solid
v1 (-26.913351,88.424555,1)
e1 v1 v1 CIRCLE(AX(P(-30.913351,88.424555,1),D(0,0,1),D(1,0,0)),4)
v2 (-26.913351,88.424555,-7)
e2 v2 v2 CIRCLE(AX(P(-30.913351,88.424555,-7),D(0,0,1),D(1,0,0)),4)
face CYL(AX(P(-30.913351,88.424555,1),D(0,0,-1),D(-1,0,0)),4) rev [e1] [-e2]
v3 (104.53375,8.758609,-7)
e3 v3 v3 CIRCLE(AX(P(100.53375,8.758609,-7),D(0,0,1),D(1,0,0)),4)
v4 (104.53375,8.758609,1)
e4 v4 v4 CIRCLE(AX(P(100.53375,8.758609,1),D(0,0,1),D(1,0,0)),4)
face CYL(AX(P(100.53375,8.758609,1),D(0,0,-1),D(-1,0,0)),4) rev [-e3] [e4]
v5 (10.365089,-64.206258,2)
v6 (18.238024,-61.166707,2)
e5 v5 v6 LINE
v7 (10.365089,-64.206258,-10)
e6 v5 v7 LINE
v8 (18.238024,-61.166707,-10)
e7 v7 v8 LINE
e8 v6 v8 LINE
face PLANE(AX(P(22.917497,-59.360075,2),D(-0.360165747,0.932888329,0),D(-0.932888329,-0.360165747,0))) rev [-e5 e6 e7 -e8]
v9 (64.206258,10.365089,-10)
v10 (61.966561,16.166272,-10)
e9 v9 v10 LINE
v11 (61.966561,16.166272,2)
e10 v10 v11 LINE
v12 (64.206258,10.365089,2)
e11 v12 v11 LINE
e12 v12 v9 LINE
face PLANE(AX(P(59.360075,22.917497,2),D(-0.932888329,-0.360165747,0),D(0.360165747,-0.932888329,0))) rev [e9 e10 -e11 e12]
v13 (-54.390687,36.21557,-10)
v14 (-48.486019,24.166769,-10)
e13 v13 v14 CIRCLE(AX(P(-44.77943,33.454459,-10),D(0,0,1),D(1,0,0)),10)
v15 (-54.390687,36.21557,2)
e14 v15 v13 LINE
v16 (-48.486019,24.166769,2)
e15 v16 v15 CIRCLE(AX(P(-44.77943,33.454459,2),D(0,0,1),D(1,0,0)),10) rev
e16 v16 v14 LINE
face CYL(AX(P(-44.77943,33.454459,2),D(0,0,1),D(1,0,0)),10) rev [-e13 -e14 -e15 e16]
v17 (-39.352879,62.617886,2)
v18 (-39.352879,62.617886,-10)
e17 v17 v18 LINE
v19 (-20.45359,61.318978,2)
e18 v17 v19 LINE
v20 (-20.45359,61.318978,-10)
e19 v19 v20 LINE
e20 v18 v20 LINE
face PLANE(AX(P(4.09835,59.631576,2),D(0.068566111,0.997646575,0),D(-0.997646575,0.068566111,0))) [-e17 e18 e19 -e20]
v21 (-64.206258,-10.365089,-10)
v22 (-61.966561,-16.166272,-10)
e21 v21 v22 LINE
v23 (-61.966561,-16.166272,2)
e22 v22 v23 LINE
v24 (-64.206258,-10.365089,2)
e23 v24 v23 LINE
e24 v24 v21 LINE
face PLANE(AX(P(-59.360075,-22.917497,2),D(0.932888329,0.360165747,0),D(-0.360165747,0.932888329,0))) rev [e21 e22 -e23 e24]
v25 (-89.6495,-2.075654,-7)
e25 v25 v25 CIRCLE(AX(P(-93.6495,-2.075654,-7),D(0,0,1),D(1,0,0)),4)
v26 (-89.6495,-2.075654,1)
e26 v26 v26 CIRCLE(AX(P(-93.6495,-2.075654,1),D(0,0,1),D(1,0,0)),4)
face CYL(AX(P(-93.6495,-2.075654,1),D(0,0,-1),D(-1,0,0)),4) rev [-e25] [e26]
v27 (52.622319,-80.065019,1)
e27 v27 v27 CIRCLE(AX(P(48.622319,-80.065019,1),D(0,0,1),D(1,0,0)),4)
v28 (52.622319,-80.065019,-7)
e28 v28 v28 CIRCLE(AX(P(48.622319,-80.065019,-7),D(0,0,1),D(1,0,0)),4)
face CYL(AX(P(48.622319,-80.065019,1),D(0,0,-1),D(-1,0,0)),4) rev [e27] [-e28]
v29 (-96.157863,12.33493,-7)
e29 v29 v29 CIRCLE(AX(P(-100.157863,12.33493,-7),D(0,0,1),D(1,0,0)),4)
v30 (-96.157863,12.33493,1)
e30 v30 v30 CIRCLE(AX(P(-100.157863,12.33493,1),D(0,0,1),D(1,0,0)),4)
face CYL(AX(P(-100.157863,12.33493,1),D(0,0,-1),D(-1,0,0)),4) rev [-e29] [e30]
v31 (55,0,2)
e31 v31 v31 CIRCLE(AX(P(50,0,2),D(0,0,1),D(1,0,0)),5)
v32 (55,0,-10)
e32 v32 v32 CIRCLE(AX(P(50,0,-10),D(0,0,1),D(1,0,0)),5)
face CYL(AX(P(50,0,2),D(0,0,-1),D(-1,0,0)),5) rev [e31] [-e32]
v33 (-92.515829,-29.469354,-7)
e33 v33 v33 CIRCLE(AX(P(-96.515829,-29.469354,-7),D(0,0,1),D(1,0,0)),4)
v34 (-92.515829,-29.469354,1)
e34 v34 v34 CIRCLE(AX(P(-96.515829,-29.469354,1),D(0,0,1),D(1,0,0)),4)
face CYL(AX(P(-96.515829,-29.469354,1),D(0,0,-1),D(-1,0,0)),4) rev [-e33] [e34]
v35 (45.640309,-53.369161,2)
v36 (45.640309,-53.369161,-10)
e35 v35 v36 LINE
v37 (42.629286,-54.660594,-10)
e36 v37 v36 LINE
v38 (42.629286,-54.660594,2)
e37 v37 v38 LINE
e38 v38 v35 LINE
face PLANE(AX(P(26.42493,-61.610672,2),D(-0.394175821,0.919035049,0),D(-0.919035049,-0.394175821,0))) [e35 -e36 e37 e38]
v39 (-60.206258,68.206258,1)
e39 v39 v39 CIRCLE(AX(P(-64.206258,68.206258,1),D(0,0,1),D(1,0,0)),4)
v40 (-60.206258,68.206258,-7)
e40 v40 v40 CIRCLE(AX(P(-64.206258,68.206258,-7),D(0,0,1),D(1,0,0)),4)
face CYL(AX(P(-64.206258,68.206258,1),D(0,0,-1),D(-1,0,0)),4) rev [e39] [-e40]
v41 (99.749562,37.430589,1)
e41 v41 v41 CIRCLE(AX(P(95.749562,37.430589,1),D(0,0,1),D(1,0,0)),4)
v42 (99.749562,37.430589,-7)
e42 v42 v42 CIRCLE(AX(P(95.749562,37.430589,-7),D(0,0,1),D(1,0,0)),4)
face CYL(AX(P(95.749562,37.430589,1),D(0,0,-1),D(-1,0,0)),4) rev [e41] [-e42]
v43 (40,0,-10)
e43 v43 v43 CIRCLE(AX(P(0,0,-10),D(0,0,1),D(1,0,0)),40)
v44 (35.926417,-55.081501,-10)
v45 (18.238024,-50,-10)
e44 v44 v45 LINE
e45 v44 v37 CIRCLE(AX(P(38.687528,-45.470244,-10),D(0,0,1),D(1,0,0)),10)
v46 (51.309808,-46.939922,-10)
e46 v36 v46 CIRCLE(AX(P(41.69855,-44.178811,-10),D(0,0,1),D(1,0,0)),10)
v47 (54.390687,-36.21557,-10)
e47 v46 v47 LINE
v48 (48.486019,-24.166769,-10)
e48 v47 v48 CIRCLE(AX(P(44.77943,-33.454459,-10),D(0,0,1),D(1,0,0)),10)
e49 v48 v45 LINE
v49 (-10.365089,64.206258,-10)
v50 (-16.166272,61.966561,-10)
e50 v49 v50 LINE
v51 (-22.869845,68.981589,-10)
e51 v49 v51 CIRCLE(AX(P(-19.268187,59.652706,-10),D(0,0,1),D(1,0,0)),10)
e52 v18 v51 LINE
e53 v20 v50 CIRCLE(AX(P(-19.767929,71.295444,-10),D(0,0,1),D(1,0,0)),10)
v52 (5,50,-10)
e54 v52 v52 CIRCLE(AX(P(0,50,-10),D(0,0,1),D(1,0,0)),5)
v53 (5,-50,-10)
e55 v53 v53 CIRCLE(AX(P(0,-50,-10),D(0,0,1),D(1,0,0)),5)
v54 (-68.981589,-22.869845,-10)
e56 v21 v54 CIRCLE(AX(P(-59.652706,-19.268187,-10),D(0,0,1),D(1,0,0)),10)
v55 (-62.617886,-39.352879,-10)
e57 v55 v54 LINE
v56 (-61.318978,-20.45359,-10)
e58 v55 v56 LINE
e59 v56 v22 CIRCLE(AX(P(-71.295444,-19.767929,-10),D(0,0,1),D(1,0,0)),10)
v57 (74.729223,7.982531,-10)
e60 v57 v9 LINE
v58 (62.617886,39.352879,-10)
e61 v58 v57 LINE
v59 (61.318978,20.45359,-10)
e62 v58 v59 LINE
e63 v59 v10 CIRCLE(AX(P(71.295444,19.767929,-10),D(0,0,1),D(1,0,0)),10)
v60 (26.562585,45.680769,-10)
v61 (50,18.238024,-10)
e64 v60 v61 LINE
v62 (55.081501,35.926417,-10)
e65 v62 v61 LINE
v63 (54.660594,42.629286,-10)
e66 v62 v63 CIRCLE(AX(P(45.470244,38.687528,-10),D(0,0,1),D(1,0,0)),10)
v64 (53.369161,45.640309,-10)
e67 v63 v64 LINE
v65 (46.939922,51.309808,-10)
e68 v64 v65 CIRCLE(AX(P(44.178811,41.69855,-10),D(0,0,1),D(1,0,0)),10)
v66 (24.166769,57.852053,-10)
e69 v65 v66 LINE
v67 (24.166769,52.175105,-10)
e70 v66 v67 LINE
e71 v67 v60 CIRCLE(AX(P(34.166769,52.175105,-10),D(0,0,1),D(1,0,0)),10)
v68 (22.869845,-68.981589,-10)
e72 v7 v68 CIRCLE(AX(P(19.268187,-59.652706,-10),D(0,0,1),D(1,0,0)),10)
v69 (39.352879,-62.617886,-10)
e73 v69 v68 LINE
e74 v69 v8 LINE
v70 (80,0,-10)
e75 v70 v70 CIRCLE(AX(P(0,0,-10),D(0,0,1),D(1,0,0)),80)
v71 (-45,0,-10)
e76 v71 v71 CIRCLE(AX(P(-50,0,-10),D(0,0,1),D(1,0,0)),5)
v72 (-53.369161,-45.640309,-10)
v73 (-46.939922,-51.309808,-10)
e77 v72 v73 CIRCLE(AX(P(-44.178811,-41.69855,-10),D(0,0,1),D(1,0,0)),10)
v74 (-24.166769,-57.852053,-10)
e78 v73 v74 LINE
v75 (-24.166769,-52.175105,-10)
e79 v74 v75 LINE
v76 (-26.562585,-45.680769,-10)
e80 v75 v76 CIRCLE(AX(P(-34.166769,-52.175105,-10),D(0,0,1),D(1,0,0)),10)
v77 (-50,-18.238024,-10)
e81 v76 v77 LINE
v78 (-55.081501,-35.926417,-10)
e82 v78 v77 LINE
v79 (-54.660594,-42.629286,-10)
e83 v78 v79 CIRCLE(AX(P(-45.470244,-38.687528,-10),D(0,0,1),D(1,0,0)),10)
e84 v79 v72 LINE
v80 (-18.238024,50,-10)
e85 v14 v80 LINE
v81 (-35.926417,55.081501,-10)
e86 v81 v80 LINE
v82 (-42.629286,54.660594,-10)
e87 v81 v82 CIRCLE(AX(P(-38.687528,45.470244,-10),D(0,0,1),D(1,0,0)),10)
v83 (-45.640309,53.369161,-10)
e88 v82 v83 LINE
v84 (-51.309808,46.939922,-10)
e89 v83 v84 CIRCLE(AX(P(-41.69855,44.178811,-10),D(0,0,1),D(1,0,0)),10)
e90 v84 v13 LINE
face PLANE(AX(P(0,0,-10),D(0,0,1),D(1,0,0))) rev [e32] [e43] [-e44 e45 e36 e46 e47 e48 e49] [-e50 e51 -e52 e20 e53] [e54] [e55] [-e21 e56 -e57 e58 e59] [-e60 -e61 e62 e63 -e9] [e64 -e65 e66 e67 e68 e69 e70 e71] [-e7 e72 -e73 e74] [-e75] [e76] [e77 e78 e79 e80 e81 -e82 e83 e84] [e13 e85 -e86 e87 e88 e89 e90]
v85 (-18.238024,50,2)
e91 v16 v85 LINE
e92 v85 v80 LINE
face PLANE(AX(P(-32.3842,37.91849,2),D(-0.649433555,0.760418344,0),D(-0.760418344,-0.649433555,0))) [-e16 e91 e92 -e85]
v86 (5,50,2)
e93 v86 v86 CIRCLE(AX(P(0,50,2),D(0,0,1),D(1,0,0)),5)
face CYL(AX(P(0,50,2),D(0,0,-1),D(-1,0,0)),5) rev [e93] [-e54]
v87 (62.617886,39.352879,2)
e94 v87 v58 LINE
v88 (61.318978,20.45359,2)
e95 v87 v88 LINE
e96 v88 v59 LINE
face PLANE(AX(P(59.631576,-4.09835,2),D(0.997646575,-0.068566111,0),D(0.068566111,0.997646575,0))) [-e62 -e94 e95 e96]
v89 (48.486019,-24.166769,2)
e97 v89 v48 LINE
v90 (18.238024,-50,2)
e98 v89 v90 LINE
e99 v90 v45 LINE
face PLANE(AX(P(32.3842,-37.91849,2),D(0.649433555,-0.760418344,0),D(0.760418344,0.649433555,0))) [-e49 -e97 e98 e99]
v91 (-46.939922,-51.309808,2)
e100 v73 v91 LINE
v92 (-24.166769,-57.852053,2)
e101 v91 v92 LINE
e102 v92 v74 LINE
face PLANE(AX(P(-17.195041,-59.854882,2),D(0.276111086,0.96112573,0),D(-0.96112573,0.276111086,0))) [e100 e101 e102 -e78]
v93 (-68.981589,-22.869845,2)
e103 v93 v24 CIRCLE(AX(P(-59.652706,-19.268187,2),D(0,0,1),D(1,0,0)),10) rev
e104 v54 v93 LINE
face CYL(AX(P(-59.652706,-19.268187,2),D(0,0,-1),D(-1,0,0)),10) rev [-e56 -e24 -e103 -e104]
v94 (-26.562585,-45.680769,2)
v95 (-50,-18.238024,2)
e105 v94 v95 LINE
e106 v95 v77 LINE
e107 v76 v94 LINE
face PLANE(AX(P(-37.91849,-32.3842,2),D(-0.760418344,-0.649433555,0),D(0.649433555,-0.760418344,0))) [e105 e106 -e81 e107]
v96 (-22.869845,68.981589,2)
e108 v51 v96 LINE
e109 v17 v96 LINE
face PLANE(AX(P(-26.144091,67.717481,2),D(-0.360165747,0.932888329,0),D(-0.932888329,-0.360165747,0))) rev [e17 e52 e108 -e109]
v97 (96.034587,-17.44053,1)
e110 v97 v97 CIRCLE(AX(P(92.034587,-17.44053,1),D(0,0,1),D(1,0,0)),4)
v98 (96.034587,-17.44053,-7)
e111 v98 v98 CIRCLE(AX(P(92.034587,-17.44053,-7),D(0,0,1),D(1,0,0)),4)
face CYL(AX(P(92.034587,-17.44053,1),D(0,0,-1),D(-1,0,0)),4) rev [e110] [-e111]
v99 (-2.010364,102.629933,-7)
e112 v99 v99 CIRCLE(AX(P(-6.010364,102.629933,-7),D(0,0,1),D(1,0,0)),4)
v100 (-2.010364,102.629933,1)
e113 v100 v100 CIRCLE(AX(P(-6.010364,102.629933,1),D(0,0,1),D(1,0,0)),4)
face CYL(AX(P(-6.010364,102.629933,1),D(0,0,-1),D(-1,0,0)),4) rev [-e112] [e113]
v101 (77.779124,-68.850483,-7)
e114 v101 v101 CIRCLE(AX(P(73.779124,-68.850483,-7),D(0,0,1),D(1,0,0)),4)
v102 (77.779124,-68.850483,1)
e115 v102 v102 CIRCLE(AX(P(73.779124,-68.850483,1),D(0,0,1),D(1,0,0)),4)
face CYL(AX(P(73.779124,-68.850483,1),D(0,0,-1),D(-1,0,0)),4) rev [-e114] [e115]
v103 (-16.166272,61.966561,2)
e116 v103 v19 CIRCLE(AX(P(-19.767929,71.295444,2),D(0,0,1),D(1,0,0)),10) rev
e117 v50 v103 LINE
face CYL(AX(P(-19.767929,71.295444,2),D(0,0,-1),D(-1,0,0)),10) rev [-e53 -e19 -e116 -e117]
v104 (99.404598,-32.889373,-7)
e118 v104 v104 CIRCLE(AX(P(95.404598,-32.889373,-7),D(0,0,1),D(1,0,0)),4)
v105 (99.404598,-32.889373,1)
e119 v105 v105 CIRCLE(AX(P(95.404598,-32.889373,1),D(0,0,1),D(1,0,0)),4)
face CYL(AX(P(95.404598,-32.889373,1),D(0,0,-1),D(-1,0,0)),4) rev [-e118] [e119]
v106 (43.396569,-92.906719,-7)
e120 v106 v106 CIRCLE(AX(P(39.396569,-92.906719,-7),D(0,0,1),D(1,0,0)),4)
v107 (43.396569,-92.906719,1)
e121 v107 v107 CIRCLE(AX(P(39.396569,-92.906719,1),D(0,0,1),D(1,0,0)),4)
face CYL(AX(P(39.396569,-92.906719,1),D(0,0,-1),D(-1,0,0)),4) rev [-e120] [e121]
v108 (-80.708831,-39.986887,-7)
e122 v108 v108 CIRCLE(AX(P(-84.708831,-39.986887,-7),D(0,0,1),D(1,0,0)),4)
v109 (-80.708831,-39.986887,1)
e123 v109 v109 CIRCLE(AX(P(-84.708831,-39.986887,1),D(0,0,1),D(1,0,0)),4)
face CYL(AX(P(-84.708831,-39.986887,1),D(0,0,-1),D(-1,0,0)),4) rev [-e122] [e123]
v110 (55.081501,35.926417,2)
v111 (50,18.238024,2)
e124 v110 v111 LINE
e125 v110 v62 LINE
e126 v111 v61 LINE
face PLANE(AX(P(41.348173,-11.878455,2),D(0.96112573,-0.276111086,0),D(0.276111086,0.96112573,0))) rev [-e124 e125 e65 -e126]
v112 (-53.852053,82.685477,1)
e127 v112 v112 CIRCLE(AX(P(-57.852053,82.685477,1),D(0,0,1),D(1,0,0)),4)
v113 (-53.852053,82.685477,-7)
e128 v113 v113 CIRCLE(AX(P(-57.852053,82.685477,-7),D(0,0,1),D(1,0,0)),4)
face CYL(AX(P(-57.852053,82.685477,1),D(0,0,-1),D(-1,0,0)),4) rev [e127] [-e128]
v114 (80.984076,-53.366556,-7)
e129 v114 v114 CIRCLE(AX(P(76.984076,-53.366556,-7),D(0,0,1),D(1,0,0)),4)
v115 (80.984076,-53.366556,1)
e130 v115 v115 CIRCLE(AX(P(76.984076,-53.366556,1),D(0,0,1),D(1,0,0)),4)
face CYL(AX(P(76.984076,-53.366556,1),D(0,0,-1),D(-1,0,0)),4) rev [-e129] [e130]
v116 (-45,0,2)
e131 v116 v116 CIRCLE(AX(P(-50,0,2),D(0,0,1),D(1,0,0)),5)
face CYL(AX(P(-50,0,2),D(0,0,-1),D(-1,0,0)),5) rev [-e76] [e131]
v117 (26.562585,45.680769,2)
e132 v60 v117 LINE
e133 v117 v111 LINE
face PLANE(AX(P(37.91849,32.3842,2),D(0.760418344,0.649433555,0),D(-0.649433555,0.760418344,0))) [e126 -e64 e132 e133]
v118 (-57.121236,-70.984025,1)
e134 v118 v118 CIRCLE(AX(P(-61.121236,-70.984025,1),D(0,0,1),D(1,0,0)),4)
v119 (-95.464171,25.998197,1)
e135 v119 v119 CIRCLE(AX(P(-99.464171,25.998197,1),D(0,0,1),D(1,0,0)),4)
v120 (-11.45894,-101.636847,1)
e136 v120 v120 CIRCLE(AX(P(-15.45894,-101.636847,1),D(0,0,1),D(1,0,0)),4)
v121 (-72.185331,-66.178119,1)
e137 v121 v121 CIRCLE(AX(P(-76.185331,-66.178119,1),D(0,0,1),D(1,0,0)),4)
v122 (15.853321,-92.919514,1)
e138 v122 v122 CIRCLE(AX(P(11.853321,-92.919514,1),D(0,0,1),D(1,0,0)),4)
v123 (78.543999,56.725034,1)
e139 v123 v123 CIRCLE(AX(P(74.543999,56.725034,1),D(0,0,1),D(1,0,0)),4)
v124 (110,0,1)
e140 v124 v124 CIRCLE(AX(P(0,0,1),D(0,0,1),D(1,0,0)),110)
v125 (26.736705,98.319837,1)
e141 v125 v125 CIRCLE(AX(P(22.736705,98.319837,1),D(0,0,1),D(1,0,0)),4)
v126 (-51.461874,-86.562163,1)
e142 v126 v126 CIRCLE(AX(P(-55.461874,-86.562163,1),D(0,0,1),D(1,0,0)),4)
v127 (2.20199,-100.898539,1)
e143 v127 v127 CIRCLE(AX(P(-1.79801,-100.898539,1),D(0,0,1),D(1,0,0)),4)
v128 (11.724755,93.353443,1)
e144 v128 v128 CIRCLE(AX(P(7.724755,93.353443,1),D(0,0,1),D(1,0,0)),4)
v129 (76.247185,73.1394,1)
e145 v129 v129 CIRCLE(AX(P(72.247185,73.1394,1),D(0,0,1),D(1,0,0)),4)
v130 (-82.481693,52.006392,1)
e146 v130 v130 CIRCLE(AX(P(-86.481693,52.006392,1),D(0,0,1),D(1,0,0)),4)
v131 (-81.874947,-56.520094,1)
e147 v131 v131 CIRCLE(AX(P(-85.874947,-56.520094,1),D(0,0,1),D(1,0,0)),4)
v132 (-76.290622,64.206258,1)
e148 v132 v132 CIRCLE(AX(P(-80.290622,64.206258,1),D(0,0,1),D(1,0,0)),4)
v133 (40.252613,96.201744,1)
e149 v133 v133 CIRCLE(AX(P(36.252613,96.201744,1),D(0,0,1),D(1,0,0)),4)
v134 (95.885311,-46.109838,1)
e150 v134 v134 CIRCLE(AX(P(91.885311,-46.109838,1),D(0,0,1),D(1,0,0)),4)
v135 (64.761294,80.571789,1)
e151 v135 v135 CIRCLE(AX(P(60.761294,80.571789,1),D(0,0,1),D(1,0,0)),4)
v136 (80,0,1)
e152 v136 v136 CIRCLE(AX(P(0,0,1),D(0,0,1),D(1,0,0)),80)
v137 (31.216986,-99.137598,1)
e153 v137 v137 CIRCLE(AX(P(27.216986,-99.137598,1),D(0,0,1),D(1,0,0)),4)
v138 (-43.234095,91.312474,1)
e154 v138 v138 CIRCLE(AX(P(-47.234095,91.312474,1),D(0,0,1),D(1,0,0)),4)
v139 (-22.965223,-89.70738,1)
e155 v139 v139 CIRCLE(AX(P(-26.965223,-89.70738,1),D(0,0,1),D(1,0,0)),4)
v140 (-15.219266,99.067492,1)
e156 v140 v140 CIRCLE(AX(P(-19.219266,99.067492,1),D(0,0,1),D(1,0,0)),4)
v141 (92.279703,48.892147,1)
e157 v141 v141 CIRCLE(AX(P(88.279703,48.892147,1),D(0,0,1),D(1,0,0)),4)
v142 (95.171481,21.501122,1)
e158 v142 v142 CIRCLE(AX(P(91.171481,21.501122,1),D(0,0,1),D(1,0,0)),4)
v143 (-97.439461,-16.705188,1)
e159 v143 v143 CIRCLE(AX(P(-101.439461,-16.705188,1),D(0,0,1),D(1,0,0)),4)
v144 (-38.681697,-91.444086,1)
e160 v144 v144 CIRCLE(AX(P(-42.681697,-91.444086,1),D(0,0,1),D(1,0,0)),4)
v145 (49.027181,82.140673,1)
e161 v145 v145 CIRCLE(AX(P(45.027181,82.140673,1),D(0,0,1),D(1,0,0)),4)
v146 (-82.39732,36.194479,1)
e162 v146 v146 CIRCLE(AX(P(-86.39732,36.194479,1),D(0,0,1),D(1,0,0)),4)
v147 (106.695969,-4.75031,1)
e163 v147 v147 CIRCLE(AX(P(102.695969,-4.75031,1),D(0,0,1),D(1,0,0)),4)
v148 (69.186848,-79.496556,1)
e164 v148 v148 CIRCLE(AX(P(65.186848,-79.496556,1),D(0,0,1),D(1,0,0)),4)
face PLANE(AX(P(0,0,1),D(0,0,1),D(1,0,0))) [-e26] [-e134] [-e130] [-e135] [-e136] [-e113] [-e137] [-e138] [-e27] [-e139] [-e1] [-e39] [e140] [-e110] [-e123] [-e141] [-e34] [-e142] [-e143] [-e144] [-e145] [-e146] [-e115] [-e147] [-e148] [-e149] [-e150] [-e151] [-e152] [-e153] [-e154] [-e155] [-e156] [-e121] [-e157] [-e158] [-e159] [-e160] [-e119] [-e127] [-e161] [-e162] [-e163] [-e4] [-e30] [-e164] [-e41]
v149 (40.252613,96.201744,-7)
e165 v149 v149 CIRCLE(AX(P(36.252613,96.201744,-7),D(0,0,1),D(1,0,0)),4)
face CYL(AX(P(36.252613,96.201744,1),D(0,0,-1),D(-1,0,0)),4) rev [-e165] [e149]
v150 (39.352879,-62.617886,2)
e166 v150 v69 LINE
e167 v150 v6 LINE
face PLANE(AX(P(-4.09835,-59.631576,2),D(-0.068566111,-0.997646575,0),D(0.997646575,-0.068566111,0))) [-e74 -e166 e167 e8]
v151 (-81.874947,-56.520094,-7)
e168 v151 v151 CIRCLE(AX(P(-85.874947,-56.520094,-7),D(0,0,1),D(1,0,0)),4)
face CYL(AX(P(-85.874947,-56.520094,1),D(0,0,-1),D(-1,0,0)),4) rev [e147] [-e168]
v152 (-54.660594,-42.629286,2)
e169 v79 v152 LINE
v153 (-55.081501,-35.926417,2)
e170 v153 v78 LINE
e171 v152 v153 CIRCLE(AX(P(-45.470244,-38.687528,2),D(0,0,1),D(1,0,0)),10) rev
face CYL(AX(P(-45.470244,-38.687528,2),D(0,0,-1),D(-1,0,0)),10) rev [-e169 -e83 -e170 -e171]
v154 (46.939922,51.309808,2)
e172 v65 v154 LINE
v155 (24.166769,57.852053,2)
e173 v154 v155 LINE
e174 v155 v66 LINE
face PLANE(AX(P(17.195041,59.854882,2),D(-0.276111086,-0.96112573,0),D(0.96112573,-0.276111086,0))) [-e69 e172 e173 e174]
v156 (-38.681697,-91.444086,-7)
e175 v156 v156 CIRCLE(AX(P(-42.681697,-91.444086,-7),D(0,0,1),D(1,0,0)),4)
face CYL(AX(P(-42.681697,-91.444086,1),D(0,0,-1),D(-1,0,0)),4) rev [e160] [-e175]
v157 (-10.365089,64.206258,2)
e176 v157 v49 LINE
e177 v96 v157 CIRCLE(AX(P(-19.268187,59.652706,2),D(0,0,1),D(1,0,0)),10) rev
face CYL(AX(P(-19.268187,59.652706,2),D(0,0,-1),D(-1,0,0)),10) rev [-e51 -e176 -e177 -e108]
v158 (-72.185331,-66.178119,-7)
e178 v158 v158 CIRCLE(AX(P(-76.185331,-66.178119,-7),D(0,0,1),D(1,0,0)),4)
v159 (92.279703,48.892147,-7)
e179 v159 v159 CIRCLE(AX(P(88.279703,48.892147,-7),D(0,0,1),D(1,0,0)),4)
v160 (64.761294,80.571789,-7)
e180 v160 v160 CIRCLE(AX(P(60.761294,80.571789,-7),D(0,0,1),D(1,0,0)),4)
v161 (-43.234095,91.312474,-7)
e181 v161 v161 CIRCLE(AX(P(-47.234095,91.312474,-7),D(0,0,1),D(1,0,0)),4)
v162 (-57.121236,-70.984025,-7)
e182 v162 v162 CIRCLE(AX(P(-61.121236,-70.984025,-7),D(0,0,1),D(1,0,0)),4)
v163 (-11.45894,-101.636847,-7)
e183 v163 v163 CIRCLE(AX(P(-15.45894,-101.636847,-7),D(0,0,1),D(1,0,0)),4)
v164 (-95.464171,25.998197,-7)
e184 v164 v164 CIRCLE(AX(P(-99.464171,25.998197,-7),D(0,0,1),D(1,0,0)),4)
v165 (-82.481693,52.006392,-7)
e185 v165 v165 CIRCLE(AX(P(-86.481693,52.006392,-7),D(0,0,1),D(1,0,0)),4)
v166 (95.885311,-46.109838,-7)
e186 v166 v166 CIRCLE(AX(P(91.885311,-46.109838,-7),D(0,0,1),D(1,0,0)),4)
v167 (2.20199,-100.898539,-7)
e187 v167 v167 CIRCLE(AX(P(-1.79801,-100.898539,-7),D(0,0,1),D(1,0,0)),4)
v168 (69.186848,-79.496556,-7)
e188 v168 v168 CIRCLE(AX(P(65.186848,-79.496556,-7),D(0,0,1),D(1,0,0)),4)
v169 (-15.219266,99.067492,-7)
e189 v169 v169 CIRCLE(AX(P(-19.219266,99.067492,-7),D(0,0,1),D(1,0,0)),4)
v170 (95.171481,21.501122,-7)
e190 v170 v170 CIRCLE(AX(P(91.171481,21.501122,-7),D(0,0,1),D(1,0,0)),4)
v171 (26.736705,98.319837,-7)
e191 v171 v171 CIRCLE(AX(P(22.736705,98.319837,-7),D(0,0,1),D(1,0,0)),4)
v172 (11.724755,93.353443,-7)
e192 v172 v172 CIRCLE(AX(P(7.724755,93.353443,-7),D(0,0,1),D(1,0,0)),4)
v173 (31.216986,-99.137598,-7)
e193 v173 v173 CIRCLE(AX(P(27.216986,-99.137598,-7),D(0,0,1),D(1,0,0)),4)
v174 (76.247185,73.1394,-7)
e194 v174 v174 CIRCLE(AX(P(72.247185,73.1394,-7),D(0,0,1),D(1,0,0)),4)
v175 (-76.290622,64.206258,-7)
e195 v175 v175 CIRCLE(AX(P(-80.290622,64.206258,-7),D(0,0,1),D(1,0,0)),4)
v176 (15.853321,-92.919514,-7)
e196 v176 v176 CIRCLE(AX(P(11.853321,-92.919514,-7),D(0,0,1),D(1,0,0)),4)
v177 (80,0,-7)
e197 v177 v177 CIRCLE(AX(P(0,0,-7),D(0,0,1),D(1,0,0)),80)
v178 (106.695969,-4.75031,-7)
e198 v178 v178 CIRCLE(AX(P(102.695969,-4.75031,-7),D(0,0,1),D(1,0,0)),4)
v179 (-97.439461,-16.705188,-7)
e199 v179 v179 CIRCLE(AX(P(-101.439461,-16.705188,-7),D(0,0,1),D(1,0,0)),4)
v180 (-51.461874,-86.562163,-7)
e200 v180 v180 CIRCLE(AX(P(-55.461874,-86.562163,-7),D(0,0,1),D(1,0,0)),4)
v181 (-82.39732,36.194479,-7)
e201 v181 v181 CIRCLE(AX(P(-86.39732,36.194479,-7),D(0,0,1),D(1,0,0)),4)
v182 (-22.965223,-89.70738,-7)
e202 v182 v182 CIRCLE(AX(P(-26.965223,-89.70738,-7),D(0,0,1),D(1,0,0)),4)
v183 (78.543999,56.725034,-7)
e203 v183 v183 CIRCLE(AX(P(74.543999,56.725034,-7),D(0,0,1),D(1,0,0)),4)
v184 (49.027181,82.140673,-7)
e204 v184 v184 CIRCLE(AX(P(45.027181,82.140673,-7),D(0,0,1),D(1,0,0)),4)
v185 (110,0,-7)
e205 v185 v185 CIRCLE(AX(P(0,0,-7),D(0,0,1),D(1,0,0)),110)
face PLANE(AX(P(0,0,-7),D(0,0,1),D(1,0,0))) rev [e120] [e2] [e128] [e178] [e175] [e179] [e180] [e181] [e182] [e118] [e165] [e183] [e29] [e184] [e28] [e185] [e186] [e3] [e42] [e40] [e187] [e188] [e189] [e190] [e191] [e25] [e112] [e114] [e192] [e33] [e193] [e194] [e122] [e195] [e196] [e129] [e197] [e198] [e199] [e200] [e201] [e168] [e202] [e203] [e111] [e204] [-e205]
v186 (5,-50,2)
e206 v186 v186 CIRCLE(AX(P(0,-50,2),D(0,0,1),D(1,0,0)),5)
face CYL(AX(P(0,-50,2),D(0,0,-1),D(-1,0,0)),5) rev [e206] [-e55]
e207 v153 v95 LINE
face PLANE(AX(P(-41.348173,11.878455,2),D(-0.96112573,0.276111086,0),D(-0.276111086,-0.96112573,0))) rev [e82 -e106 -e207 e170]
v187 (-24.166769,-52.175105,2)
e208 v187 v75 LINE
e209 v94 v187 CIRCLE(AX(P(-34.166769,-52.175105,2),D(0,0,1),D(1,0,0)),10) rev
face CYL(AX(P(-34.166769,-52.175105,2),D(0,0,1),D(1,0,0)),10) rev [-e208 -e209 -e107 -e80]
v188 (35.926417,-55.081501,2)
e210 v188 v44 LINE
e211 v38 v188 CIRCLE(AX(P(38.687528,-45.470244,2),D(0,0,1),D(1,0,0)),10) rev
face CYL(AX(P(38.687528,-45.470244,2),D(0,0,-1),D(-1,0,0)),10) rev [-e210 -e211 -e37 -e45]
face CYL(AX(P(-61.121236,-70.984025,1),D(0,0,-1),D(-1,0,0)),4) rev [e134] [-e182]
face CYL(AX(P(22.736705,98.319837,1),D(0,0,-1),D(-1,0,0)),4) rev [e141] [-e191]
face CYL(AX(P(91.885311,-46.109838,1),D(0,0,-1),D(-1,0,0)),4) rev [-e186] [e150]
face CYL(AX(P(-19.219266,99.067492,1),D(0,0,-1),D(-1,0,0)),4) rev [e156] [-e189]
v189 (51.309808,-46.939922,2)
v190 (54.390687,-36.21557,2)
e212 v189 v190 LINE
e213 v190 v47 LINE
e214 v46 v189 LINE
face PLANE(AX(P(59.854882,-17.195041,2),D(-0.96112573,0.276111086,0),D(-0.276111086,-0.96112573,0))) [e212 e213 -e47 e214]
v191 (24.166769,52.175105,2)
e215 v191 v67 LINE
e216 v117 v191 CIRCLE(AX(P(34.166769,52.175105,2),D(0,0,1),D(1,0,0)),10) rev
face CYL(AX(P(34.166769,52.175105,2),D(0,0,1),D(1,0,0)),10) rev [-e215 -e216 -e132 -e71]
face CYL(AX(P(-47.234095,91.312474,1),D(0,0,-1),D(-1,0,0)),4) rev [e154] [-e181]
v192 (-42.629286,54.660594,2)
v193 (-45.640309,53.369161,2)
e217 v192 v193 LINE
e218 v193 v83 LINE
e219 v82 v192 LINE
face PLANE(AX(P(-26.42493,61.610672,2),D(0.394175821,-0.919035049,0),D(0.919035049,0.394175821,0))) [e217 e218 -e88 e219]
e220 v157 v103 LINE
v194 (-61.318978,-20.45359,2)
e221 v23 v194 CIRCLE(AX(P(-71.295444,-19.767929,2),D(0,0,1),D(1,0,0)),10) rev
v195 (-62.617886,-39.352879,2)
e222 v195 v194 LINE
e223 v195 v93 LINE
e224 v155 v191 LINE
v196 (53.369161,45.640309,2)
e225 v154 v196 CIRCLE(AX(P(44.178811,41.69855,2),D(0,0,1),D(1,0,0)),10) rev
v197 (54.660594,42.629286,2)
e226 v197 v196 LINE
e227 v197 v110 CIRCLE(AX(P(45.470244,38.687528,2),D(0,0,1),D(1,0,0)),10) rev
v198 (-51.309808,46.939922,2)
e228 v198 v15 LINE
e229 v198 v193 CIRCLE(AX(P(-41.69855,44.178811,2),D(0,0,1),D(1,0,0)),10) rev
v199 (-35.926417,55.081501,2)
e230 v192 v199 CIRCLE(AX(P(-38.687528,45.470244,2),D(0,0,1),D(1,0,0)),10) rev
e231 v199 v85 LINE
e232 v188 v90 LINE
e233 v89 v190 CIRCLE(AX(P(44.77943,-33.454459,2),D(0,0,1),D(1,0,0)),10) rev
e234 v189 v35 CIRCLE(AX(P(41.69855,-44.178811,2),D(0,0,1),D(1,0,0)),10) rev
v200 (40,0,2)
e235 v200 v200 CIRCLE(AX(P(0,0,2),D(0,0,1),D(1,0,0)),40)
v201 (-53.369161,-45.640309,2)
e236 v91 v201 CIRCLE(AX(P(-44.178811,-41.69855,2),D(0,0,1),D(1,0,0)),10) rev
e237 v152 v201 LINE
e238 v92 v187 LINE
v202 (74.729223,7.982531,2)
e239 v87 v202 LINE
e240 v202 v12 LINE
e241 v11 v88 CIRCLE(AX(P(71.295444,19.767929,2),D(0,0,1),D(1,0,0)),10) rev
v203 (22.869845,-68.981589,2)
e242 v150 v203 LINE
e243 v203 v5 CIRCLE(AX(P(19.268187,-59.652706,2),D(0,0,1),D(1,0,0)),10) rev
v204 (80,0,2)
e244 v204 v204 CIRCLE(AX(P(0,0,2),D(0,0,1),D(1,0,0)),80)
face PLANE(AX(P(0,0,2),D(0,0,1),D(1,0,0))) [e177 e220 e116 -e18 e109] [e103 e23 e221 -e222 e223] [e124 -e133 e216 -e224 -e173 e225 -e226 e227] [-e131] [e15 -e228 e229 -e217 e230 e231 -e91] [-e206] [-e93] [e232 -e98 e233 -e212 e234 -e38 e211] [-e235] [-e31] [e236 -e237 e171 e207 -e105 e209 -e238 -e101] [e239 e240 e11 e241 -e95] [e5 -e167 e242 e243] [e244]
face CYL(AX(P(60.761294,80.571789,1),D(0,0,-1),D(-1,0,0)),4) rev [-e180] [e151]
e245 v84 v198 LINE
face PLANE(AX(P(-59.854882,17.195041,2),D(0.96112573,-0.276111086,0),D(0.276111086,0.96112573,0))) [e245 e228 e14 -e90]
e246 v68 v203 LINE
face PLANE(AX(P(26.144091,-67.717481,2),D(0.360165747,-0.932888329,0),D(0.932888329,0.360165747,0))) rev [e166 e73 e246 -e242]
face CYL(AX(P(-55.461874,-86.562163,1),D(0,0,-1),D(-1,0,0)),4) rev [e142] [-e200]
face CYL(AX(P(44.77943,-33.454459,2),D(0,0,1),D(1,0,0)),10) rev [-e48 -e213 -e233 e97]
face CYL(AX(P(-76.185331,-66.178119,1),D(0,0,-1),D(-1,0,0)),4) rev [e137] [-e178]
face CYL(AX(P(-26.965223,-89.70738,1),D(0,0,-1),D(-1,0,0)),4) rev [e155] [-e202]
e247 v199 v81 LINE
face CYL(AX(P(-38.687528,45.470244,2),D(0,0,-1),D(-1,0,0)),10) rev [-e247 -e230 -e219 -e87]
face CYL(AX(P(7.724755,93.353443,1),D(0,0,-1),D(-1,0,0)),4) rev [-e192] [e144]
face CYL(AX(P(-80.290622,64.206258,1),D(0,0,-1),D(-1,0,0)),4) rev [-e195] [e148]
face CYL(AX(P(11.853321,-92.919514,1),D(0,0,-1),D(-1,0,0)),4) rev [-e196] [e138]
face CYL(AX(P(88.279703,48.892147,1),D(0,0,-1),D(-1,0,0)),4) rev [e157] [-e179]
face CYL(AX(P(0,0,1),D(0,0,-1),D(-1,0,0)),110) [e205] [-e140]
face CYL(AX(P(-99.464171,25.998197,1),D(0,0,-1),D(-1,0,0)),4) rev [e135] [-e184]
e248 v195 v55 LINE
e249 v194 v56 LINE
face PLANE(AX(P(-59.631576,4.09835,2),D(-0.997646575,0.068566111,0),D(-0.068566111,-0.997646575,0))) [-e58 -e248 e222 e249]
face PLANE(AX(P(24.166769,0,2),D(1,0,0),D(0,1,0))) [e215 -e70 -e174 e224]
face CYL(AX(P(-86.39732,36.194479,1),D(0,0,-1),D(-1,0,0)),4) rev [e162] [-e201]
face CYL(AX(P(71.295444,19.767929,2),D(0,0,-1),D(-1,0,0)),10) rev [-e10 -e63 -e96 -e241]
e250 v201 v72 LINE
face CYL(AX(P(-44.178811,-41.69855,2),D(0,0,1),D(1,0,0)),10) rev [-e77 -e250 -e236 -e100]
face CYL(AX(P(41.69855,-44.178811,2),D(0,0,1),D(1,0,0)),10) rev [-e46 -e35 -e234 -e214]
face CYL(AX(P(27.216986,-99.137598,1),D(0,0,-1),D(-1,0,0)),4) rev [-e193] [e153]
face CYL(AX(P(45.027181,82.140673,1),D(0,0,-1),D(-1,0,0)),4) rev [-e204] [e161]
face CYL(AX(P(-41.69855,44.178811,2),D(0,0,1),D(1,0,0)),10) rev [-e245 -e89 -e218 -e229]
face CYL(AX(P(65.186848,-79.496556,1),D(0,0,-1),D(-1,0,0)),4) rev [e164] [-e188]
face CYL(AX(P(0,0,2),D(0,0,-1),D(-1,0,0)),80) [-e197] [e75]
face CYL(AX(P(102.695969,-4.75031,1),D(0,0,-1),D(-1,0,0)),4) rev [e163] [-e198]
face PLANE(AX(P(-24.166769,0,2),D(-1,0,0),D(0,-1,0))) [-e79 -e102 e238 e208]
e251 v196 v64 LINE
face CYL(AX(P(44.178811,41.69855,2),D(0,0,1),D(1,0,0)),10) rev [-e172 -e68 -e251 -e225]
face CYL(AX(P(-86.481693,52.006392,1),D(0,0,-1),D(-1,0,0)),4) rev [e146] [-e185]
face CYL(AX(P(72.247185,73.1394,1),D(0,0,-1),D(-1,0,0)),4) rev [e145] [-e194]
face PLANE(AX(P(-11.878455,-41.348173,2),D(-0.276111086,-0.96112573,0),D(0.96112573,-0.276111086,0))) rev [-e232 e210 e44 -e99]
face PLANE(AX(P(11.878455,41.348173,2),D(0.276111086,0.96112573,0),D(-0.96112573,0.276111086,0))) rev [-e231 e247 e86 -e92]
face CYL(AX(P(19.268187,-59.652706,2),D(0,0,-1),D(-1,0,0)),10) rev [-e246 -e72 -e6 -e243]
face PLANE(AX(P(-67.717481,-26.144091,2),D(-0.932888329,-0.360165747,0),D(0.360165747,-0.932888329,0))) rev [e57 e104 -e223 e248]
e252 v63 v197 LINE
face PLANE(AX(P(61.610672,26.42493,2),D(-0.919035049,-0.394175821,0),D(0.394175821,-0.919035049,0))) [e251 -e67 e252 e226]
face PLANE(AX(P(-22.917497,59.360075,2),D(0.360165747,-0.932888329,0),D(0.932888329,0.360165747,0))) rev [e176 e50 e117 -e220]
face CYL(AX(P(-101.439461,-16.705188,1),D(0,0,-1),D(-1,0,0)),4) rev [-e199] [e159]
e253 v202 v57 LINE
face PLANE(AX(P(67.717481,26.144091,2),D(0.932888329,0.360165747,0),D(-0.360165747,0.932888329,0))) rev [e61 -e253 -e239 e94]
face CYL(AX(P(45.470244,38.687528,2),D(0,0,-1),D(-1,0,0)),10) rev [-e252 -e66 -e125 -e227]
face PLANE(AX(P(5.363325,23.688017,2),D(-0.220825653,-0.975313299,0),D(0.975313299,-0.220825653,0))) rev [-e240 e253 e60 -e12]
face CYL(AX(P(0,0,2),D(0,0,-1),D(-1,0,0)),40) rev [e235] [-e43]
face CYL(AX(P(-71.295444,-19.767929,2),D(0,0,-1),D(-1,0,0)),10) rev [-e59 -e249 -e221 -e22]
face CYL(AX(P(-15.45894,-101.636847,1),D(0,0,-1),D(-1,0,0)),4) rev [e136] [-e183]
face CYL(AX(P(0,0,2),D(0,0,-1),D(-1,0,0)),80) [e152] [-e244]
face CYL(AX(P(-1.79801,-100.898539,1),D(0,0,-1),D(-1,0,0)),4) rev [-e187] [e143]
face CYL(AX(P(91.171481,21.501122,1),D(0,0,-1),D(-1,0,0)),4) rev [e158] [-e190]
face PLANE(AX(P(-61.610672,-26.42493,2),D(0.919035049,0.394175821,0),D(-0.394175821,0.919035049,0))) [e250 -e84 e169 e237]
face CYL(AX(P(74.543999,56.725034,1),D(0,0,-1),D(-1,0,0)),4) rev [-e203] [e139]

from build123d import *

# Parameters (mm, degrees)
BOSS_EXTRUDE3_DEPTH      = 2
BOSS_EXTRUDE3_DEPTH_BACK = 10
SKETCH1_R                = 80
SKETCH1_R_2              = 40
SKETCH1_R_3              = 5
BOSS_EXTRUDE4_DEPTH      = 1
BOSS_EXTRUDE4_DEPTH_BACK = 7
SKETCH1_6_R              = 110
SKETCH1_6_R_2            = 4
SKETCH1_6_R_3            = 80
FILLET1_R                = 10


with BuildPart() as part:
    # Sketch1 → Boss-Extrude3 (new, two sides: drawn at the far end of the back side and taken through both)
    with BuildSketch(Plane.XY.offset(-BOSS_EXTRUDE3_DEPTH_BACK)):
        Circle(SKETCH1_R)
        Circle(SKETCH1_R_2, mode=Mode.SUBTRACT)
        with Locations((0, 50)):
            Circle(SKETCH1_R_3, mode=Mode.SUBTRACT)
        with Locations((50, 0)):
            Circle(SKETCH1_R_3, mode=Mode.SUBTRACT)
        with Locations((0, -50)):
            Circle(SKETCH1_R_3, mode=Mode.SUBTRACT)
        with Locations((-50, 0)):
            Circle(SKETCH1_R_3, mode=Mode.SUBTRACT)
        Polygon((-39.35287908, 62.61788604), (-7.982530522, 74.729223141), (-10.365088641, 64.206258119), (-18.238023599, 61.166707281), align=None, mode=Mode.SUBTRACT)
        Polygon((-39.35287908, 56.065851214), (-18.238023599, 50), (-48.486018534, 24.166768812), (-57.852052568, 24.166768812), (-50, 51.499281488), align=None, mode=Mode.SUBTRACT)
        Polygon((62.61788604, 39.35287908), (61.166707281, 18.238023599), (64.206258119, 10.365088641), (74.729223141, 7.982530522), align=None, mode=Mode.SUBTRACT)
        Polygon((24.166768812, 48.486018534), (50, 18.238023599), (56.065851214, 39.35287908), (51.499281488, 50), (24.166768812, 57.852052568), align=None, mode=Mode.SUBTRACT)
        Polygon((39.35287908, -62.61788604), (18.238023599, -61.166707281), (10.365088641, -64.206258119), (7.982530522, -74.729223141), align=None, mode=Mode.SUBTRACT)
        Polygon((48.486018534, -24.166768812), (18.238023599, -50), (39.35287908, -56.065851214), (50, -51.499281488), (57.852052568, -24.166768812), align=None, mode=Mode.SUBTRACT)
        Polygon((-62.61788604, -39.35287908), (-61.166707281, -18.238023599), (-64.206258119, -10.365088641), (-74.729223141, -7.982530522), align=None, mode=Mode.SUBTRACT)
        Polygon((-24.166768812, -48.486018534), (-50, -18.238023599), (-56.065851214, -39.35287908), (-51.499281488, -50), (-24.166768812, -57.852052568), align=None, mode=Mode.SUBTRACT)
    extrude(amount=BOSS_EXTRUDE3_DEPTH + BOSS_EXTRUDE3_DEPTH_BACK)

    # Sketch1<6> → Boss-Extrude4 (add, two sides: drawn at the far end of the back side and taken through both)
    with BuildSketch(Plane.XY.offset(-BOSS_EXTRUDE4_DEPTH_BACK)):
        Circle(SKETCH1_6_R)
        with Locations((-55.461874175, -86.562163177)):
            Circle(SKETCH1_6_R_2, mode=Mode.SUBTRACT)
        with Locations((-85.874946892, -56.520094454)):
            Circle(SKETCH1_6_R_2, mode=Mode.SUBTRACT)
        with Locations((-61.121235607, -70.984024865)):
            Circle(SKETCH1_6_R_2, mode=Mode.SUBTRACT)
        with Locations((-76.185331155, -66.178118816)):
            Circle(SKETCH1_6_R_2, mode=Mode.SUBTRACT)
        with Locations((-42.681697323, -91.444085685)):
            Circle(SKETCH1_6_R_2, mode=Mode.SUBTRACT)
        with Locations((-15.458939556, -101.636847495)):
            Circle(SKETCH1_6_R_2, mode=Mode.SUBTRACT)
        with Locations((-1.798010273, -100.898539396)):
            Circle(SKETCH1_6_R_2, mode=Mode.SUBTRACT)
        with Locations((-26.965223169, -89.707379672)):
            Circle(SKETCH1_6_R_2, mode=Mode.SUBTRACT)
        with Locations((-96.515829108, -29.469353994)):
            Circle(SKETCH1_6_R_2, mode=Mode.SUBTRACT)
        with Locations((-84.70883114, -39.986887289)):
            Circle(SKETCH1_6_R_2, mode=Mode.SUBTRACT)
        with Locations((-101.439461143, -16.70518793)):
            Circle(SKETCH1_6_R_2, mode=Mode.SUBTRACT)
        with Locations((-93.649500213, -2.075653632)):
            Circle(SKETCH1_6_R_2, mode=Mode.SUBTRACT)
        with Locations((27.216986151, -99.137597538)):
            Circle(SKETCH1_6_R_2, mode=Mode.SUBTRACT)
        with Locations((11.853321327, -92.919513568)):
            Circle(SKETCH1_6_R_2, mode=Mode.SUBTRACT)
        with Locations((39.396569088, -92.906719011)):
            Circle(SKETCH1_6_R_2, mode=Mode.SUBTRACT)
        with Locations((48.622318881, -80.06501942)):
            Circle(SKETCH1_6_R_2, mode=Mode.SUBTRACT)
        with Locations((65.186847694, -79.496556331)):
            Circle(SKETCH1_6_R_2, mode=Mode.SUBTRACT)
        with Locations((73.779123746, -68.850482877)):
            Circle(SKETCH1_6_R_2, mode=Mode.SUBTRACT)
        with Locations((76.984075781, -53.366556047)):
            Circle(SKETCH1_6_R_2, mode=Mode.SUBTRACT)
        with Locations((91.885311068, -46.109838331)):
            Circle(SKETCH1_6_R_2, mode=Mode.SUBTRACT)
        with Locations((95.404597647, -32.889372768)):
            Circle(SKETCH1_6_R_2, mode=Mode.SUBTRACT)
        with Locations((92.0345866, -17.440530314)):
            Circle(SKETCH1_6_R_2, mode=Mode.SUBTRACT)
        with Locations((102.695969405, -4.750310388)):
            Circle(SKETCH1_6_R_2, mode=Mode.SUBTRACT)
        with Locations((-100.157863389, 12.334929854)):
            Circle(SKETCH1_6_R_2, mode=Mode.SUBTRACT)
        with Locations((-99.464171014, 25.998197348)):
            Circle(SKETCH1_6_R_2, mode=Mode.SUBTRACT)
        with Locations((-86.397319921, 36.194479396)):
            Circle(SKETCH1_6_R_2, mode=Mode.SUBTRACT)
        with Locations((-86.481693185, 52.006392271)):
            Circle(SKETCH1_6_R_2, mode=Mode.SUBTRACT)
        with Locations((-80.290622113, 64.206258119)):
            Circle(SKETCH1_6_R_2, mode=Mode.SUBTRACT)
        with Locations((-64.206258119, 68.206258119)):
            Circle(SKETCH1_6_R_2, mode=Mode.SUBTRACT)
        with Locations((-57.852052568, 82.685477001)):
            Circle(SKETCH1_6_R_2, mode=Mode.SUBTRACT)
        with Locations((-47.234095231, 91.312473565)):
            Circle(SKETCH1_6_R_2, mode=Mode.SUBTRACT)
        with Locations((-30.913350993, 88.424555179)):
            Circle(SKETCH1_6_R_2, mode=Mode.SUBTRACT)
        with Locations((-19.219266492, 99.067491584)):
            Circle(SKETCH1_6_R_2, mode=Mode.SUBTRACT)
        with Locations((-6.010364175, 102.629932784)):
            Circle(SKETCH1_6_R_2, mode=Mode.SUBTRACT)
        Circle(SKETCH1_6_R_3, mode=Mode.SUBTRACT)
        with Locations((100.533749891, 8.758608684)):
            Circle(SKETCH1_6_R_2, mode=Mode.SUBTRACT)
        with Locations((91.171481287, 21.501121553)):
            Circle(SKETCH1_6_R_2, mode=Mode.SUBTRACT)
        with Locations((95.749561669, 37.430589376)):
            Circle(SKETCH1_6_R_2, mode=Mode.SUBTRACT)
        with Locations((88.279703458, 48.892147125)):
            Circle(SKETCH1_6_R_2, mode=Mode.SUBTRACT)
        with Locations((45.027181332, 82.140673052)):
            Circle(SKETCH1_6_R_2, mode=Mode.SUBTRACT)
        with Locations((7.724755359, 93.353443337)):
            Circle(SKETCH1_6_R_2, mode=Mode.SUBTRACT)
        with Locations((22.736705362, 98.319836872)):
            Circle(SKETCH1_6_R_2, mode=Mode.SUBTRACT)
        with Locations((36.252613449, 96.201744262)):
            Circle(SKETCH1_6_R_2, mode=Mode.SUBTRACT)
        with Locations((74.543998594, 56.725034172)):
            Circle(SKETCH1_6_R_2, mode=Mode.SUBTRACT)
        with Locations((60.761294302, 80.571789157)):
            Circle(SKETCH1_6_R_2, mode=Mode.SUBTRACT)
        with Locations((72.247184863, 73.13940019)):
            Circle(SKETCH1_6_R_2, mode=Mode.SUBTRACT)
    extrude(amount=BOSS_EXTRUDE4_DEPTH + BOSS_EXTRUDE4_DEPTH_BACK)

    # Fillet1
    # the kernel refuses this fillet: 10 mm, written as the material it adds along each edge
    with BuildSketch(Plane(origin=(61.166707281, 18.238023599, 0), x_dir=(0.36016574729150513, -0.9328883290501343, 0), z_dir=(0, 0, -1)), Plane(origin=(-61.166707281, -18.238023599, 0), x_dir=(-0.3601657472914985, 0.932888329050137, 0), z_dir=(0, 0, -1)), Plane(origin=(-18.238023599, 61.166707281, 0), x_dir=(0.9328883290501342, 0.3601657472915057, 0), z_dir=(0, 0, -1))) as fillet1_piece_1:
        with BuildLine():
            CenterArc((FILLET1_R * 0.222079309279, -FILLET1_R), FILLET1_R, 90, 25.042008993)
            Line((-FILLET1_R * 0.201203339373, -FILLET1_R * 0.0940023182422), (-FILLET1_R * 0.209668992346, -FILLET1_R * 0.075882364607))
            Line((-FILLET1_R * 0.209668992346, -FILLET1_R * 0.075882364607), (-FILLET1_R * 0.00444158618557, FILLET1_R * 0.02))
            Line((-FILLET1_R * 0.00444158618557, FILLET1_R * 0.02), (FILLET1_R * 0.222079309279, FILLET1_R * 0.02))
            Line((FILLET1_R * 0.222079309279, FILLET1_R * 0.02), (FILLET1_R * 0.222079309279, 0))
        make_face()
    extrude(amount=10)
    with BuildSketch(Plane(origin=(7.982530522, -74.729223141, 0), x_dir=(0.9328883290501362, 0.3601657472915002, 0), z_dir=(0, 0, -1)), Plane(origin=(-7.982530522, 74.729223141, 0), x_dir=(-0.9328883290501336, -0.3601657472915072, 0), z_dir=(0, 0, -1)), Plane(origin=(-74.729223141, -7.982530522, 0), x_dir=(0.36016574729149753, -0.9328883290501373, 0), z_dir=(0, 0, -1))) as fillet1_piece_2:
        with BuildLine():
            CenterArc((15.958302411, -10), FILLET1_R, 90, 84.022583564)
            Line((6.012672223, -8.958635431), (5.813759619, -8.93780814))
            ThreePointArc((5.813759619, -8.93780814), (2.8402712, -4.590773739), (-0.166064912, -0.111456023))
            Line((-0.166064912, -0.111456023), (0, 0.2))
            Line((0, 0.2), (15.958302411, 0.2))
            Line((15.958302411, 0.2), (15.958302411, 0))
        make_face()
    extrude(amount=10)
    with BuildSketch(Plane(origin=(-51.499281488, -50, 0), x_dir=(0.9611257296889827, -0.2761110858510039, 0), z_dir=(0, 0, -1)), Plane(origin=(51.499281488, 50, 0), x_dir=(-0.9611257296889844, 0.276111085850998, 0), z_dir=(0, 0, -1)), Plane(origin=(50, -51.499281488, 0), x_dir=(0.2761110858510002, 0.9611257296889839, 0), z_dir=(0, 0, -1)), Plane(origin=(-50, 51.499281488, 0), x_dir=(-0.27611108585099386, -0.9611257296889856, 0), z_dir=(0, 0, -1))) as fillet1_piece_3:
        with BuildLine():
            CenterArc((FILLET1_R * 0.474377058691, -FILLET1_R), FILLET1_R, 90, 50.757179371)
            Line((-FILLET1_R * 0.300094859609, -FILLET1_R * 0.367391710642), (-FILLET1_R * 0.315584297975, -FILLET1_R * 0.354739544855))
            Line((-FILLET1_R * 0.315584297975, -FILLET1_R * 0.354739544855), (-FILLET1_R * 0.00948754117383, FILLET1_R * 0.02))
            Line((-FILLET1_R * 0.00948754117383, FILLET1_R * 0.02), (FILLET1_R * 0.474377058691, FILLET1_R * 0.02))
            Line((FILLET1_R * 0.474377058691, FILLET1_R * 0.02), (FILLET1_R * 0.474377058691, 0))
        make_face()
    extrude(amount=10)
    with BuildSketch(Plane(origin=(-57.852052568, 24.166768812, 0), x_dir=(1, 0, 0), z_dir=(0, 0, -1)), Plane(origin=(57.852052568, -24.166768812, 0), x_dir=(-1, 0, 0), z_dir=(0, 0, -1))) as fillet1_piece_4:
        with BuildLine():
            CenterArc((13.072623037, -9.287690669), FILLET1_R, 111.756259106, 84.271979458)
            Line((3.46136574, -12.048801527), (3.269140594, -12.104023745))
            Line((3.269140594, -12.104023745), (-0.192225146, -0.055222217))
            Line((-0.192225146, -0.055222217), (0, 0.2))
            ThreePointArc((0, 0.2), (4.683017017, 0.2), (9.291902254, 0.185753813))
            Line((9.291902254, 0.185753813), (9.366034034, 0))
        make_face()
    extrude(amount=10)
    with BuildSketch(Plane(origin=(24.166768812, 48.486018534, 0), x_dir=(0, 1, 0), z_dir=(0, 0, -1)), Plane(origin=(-24.166768812, -48.486018534, 0), x_dir=(0, -1, 0), z_dir=(0, 0, -1))) as fillet1_piece_5:
        with BuildLine():
            CenterArc((FILLET1_R * 0.3689086501, FILLET1_R), FILLET1_R, 229.501092058, 40.498907942)
            Line((-FILLET1_R * 0.280524904775, FILLET1_R * 0.239581656058), (-FILLET1_R * 0.293513575872, FILLET1_R * 0.224373289179))
            Line((-FILLET1_R * 0.293513575872, FILLET1_R * 0.224373289179), (-FILLET1_R * 0.00737817300199, -FILLET1_R * 0.02))
            Line((-FILLET1_R * 0.00737817300199, -FILLET1_R * 0.02), (FILLET1_R * 0.3689086501, -FILLET1_R * 0.02))
            Line((FILLET1_R * 0.3689086501, -FILLET1_R * 0.02), (FILLET1_R * 0.3689086501, 0))
        make_face()
    extrude(amount=10)
    with BuildSketch(Plane(origin=(39.35287908, -56.065851214, 0), x_dir=(0.9190350492930653, 0.39417582139305946, 0), z_dir=(0, 0, -1)), Plane(origin=(56.065851214, 39.35287908, 0), x_dir=(-0.3941758213930612, 0.9190350492930646, 0), z_dir=(0, 0, -1)), Plane(origin=(-56.065851214, -39.35287908, 0), x_dir=(0.39417582139305507, -0.9190350492930671, 0), z_dir=(0, 0, -1))) as fillet1_piece_6:
        with BuildLine():
            CenterArc((FILLET1_R * 0.356505100381, -FILLET1_R), FILLET1_R, 90, 39.242820629)
            Line((-FILLET1_R * 0.276103188976, -FILLET1_R * 0.225528081699), (-FILLET1_R * 0.288755354763, -FILLET1_R * 0.210038643333))
            Line((-FILLET1_R * 0.288755354763, -FILLET1_R * 0.210038643333), (-FILLET1_R * 0.00713010200763, FILLET1_R * 0.02))
            Line((-FILLET1_R * 0.00713010200763, FILLET1_R * 0.02), (FILLET1_R * 0.356505100381, FILLET1_R * 0.02))
            Line((FILLET1_R * 0.356505100381, FILLET1_R * 0.02), (FILLET1_R * 0.356505100381, 0))
        make_face()
    extrude(amount=10)
    with BuildSketch(Plane(origin=(-39.35287908, 56.065851214, 0), x_dir=(0.9611257296889855, -0.27611108585099425, 0), z_dir=(0, 0, -1))) as fillet1_piece_7:
        with BuildLine():
            CenterArc((FILLET1_R * 0.356505100381, FILLET1_R), FILLET1_R, 230.757179371, 39.242820629)
            Line((-FILLET1_R * 0.276103188976, FILLET1_R * 0.225528081699), (-FILLET1_R * 0.288755354763, FILLET1_R * 0.210038643333))
            Line((-FILLET1_R * 0.288755354763, FILLET1_R * 0.210038643333), (-FILLET1_R * 0.00713010200763, -FILLET1_R * 0.02))
            Line((-FILLET1_R * 0.00713010200763, -FILLET1_R * 0.02), (FILLET1_R * 0.356505100381, -FILLET1_R * 0.02))
            Line((FILLET1_R * 0.356505100381, -FILLET1_R * 0.02), (FILLET1_R * 0.356505100381, 0))
        make_face()
    extrude(amount=10)
    with BuildSketch(Plane(origin=(-74.729223141, -7.982530522, 0), x_dir=(0.36016574729149753, -0.9328883290501373, 0), z_dir=(0, 0, 1)), Plane(origin=(-7.982530522, 74.729223141, 0), x_dir=(-0.9328883290501336, -0.3601657472915072, 0), z_dir=(0, 0, 1)), Plane(origin=(7.982530522, -74.729223141, 0), x_dir=(0.9328883290501362, 0.3601657472915002, 0), z_dir=(0, 0, 1))) as fillet1_piece_8:
        with BuildLine():
            CenterArc((15.958302411, 10), FILLET1_R, 185.977416436, 84.022583564)
            Line((6.012672223, 8.958635431), (5.813759619, 8.93780814))
            ThreePointArc((5.813759619, 8.93780814), (2.8402712, 4.590773739), (-0.166064912, 0.111456023))
            Line((-0.166064912, 0.111456023), (0, -0.2))
            Line((0, -0.2), (15.958302411, -0.2))
            Line((15.958302411, -0.2), (15.958302411, 0))
        make_face()
    extrude(amount=2)
    with BuildSketch(Plane(origin=(-24.166768812, -48.486018534, 0), x_dir=(0, -1, 0), z_dir=(0, 0, 1)), Plane(origin=(24.166768812, 48.486018534, 0), x_dir=(0, 1, 0), z_dir=(0, 0, 1))) as fillet1_piece_9:
        with BuildLine():
            CenterArc((FILLET1_R * 0.3689086501, -FILLET1_R), FILLET1_R, 90, 40.498907942)
            Line((-FILLET1_R * 0.280524904775, -FILLET1_R * 0.239581656058), (-FILLET1_R * 0.293513575872, -FILLET1_R * 0.224373289179))
            Line((-FILLET1_R * 0.293513575872, -FILLET1_R * 0.224373289179), (-FILLET1_R * 0.00737817300199, FILLET1_R * 0.02))
            Line((-FILLET1_R * 0.00737817300199, FILLET1_R * 0.02), (FILLET1_R * 0.3689086501, FILLET1_R * 0.02))
            Line((FILLET1_R * 0.3689086501, FILLET1_R * 0.02), (FILLET1_R * 0.3689086501, 0))
        make_face()
    extrude(amount=2)
    with BuildSketch(Plane(origin=(57.852052568, -24.166768812, 0), x_dir=(-1, 0, 0), z_dir=(0, 0, 1)), Plane(origin=(-57.852052568, 24.166768812, 0), x_dir=(1, 0, 0), z_dir=(0, 0, 1))) as fillet1_piece_10:
        with BuildLine():
            CenterArc((13.072623037, 9.287690669), FILLET1_R, 163.971761435, 84.271979458)
            Line((3.46136574, 12.048801527), (3.269140594, 12.104023745))
            Line((3.269140594, 12.104023745), (-0.192225146, 0.055222217))
            Line((-0.192225146, 0.055222217), (0, -0.2))
            ThreePointArc((0, -0.2), (4.683017017, -0.2), (9.291902254, -0.185753813))
            Line((9.291902254, -0.185753813), (9.366034034, 0))
        make_face()
    extrude(amount=2)
    with BuildSketch(Plane(origin=(-39.35287908, 56.065851214, 0), x_dir=(0.9611257296889855, -0.27611108585099425, 0), z_dir=(0, 0, 1))) as fillet1_piece_11:
        with BuildLine():
            CenterArc((FILLET1_R * 0.356505100381, -FILLET1_R), FILLET1_R, 90, 39.242820629)
            Line((-FILLET1_R * 0.276103188976, -FILLET1_R * 0.225528081699), (-FILLET1_R * 0.288755354763, -FILLET1_R * 0.210038643333))
            Line((-FILLET1_R * 0.288755354763, -FILLET1_R * 0.210038643333), (-FILLET1_R * 0.00713010200763, FILLET1_R * 0.02))
            Line((-FILLET1_R * 0.00713010200763, FILLET1_R * 0.02), (FILLET1_R * 0.356505100381, FILLET1_R * 0.02))
            Line((FILLET1_R * 0.356505100381, FILLET1_R * 0.02), (FILLET1_R * 0.356505100381, 0))
        make_face()
    extrude(amount=2)
    with BuildSketch(Plane(origin=(-50, 51.499281488, 0), x_dir=(-0.27611108585099386, -0.9611257296889856, 0), z_dir=(0, 0, 1)), Plane(origin=(50, -51.499281488, 0), x_dir=(0.2761110858510002, 0.9611257296889839, 0), z_dir=(0, 0, 1)), Plane(origin=(51.499281488, 50, 0), x_dir=(-0.9611257296889844, 0.276111085850998, 0), z_dir=(0, 0, 1)), Plane(origin=(-51.499281488, -50, 0), x_dir=(0.9611257296889827, -0.2761110858510039, 0), z_dir=(0, 0, 1))) as fillet1_piece_12:
        with BuildLine():
            CenterArc((FILLET1_R * 0.474377058691, FILLET1_R), FILLET1_R, 219.242820629, 50.757179371)
            Line((-FILLET1_R * 0.300094859609, FILLET1_R * 0.367391710642), (-FILLET1_R * 0.315584297975, FILLET1_R * 0.354739544855))
            Line((-FILLET1_R * 0.315584297975, FILLET1_R * 0.354739544855), (-FILLET1_R * 0.00948754117383, -FILLET1_R * 0.02))
            Line((-FILLET1_R * 0.00948754117383, -FILLET1_R * 0.02), (FILLET1_R * 0.474377058691, -FILLET1_R * 0.02))
            Line((FILLET1_R * 0.474377058691, -FILLET1_R * 0.02), (FILLET1_R * 0.474377058691, 0))
        make_face()
    extrude(amount=2)
    with BuildSketch(Plane(origin=(-56.065851214, -39.35287908, 0), x_dir=(0.39417582139305507, -0.9190350492930671, 0), z_dir=(0, 0, 1)), Plane(origin=(56.065851214, 39.35287908, 0), x_dir=(-0.3941758213930612, 0.9190350492930646, 0), z_dir=(0, 0, 1)), Plane(origin=(39.35287908, -56.065851214, 0), x_dir=(0.9190350492930653, 0.39417582139305946, 0), z_dir=(0, 0, 1))) as fillet1_piece_13:
        with BuildLine():
            CenterArc((FILLET1_R * 0.356505100381, FILLET1_R), FILLET1_R, 230.757179371, 39.242820629)
            Line((-FILLET1_R * 0.276103188976, FILLET1_R * 0.225528081699), (-FILLET1_R * 0.288755354763, FILLET1_R * 0.210038643333))
            Line((-FILLET1_R * 0.288755354763, FILLET1_R * 0.210038643333), (-FILLET1_R * 0.00713010200763, -FILLET1_R * 0.02))
            Line((-FILLET1_R * 0.00713010200763, -FILLET1_R * 0.02), (FILLET1_R * 0.356505100381, -FILLET1_R * 0.02))
            Line((FILLET1_R * 0.356505100381, -FILLET1_R * 0.02), (FILLET1_R * 0.356505100381, 0))
        make_face()
    extrude(amount=2)
    with BuildSketch(Plane(origin=(-18.238023599, 61.166707281, 0), x_dir=(0.9328883290501342, 0.3601657472915057, 0), z_dir=(0, 0, 1)), Plane(origin=(-61.166707281, -18.238023599, 0), x_dir=(-0.3601657472914985, 0.932888329050137, 0), z_dir=(0, 0, 1)), Plane(origin=(61.166707281, 18.238023599, 0), x_dir=(0.36016574729150513, -0.9328883290501343, 0), z_dir=(0, 0, 1))) as fillet1_piece_14:
        with BuildLine():
            CenterArc((FILLET1_R * 0.222079309279, FILLET1_R), FILLET1_R, 244.957991007, 25.042008993)
            Line((-FILLET1_R * 0.201203339373, FILLET1_R * 0.0940023182422), (-FILLET1_R * 0.209668992346, FILLET1_R * 0.075882364607))
            Line((-FILLET1_R * 0.209668992346, FILLET1_R * 0.075882364607), (-FILLET1_R * 0.00444158618557, -FILLET1_R * 0.02))
            Line((-FILLET1_R * 0.00444158618557, -FILLET1_R * 0.02), (FILLET1_R * 0.222079309279, -FILLET1_R * 0.02))
            Line((FILLET1_R * 0.222079309279, -FILLET1_R * 0.02), (FILLET1_R * 0.222079309279, 0))
        make_face()
    extrude(amount=2)


solid = part.part
